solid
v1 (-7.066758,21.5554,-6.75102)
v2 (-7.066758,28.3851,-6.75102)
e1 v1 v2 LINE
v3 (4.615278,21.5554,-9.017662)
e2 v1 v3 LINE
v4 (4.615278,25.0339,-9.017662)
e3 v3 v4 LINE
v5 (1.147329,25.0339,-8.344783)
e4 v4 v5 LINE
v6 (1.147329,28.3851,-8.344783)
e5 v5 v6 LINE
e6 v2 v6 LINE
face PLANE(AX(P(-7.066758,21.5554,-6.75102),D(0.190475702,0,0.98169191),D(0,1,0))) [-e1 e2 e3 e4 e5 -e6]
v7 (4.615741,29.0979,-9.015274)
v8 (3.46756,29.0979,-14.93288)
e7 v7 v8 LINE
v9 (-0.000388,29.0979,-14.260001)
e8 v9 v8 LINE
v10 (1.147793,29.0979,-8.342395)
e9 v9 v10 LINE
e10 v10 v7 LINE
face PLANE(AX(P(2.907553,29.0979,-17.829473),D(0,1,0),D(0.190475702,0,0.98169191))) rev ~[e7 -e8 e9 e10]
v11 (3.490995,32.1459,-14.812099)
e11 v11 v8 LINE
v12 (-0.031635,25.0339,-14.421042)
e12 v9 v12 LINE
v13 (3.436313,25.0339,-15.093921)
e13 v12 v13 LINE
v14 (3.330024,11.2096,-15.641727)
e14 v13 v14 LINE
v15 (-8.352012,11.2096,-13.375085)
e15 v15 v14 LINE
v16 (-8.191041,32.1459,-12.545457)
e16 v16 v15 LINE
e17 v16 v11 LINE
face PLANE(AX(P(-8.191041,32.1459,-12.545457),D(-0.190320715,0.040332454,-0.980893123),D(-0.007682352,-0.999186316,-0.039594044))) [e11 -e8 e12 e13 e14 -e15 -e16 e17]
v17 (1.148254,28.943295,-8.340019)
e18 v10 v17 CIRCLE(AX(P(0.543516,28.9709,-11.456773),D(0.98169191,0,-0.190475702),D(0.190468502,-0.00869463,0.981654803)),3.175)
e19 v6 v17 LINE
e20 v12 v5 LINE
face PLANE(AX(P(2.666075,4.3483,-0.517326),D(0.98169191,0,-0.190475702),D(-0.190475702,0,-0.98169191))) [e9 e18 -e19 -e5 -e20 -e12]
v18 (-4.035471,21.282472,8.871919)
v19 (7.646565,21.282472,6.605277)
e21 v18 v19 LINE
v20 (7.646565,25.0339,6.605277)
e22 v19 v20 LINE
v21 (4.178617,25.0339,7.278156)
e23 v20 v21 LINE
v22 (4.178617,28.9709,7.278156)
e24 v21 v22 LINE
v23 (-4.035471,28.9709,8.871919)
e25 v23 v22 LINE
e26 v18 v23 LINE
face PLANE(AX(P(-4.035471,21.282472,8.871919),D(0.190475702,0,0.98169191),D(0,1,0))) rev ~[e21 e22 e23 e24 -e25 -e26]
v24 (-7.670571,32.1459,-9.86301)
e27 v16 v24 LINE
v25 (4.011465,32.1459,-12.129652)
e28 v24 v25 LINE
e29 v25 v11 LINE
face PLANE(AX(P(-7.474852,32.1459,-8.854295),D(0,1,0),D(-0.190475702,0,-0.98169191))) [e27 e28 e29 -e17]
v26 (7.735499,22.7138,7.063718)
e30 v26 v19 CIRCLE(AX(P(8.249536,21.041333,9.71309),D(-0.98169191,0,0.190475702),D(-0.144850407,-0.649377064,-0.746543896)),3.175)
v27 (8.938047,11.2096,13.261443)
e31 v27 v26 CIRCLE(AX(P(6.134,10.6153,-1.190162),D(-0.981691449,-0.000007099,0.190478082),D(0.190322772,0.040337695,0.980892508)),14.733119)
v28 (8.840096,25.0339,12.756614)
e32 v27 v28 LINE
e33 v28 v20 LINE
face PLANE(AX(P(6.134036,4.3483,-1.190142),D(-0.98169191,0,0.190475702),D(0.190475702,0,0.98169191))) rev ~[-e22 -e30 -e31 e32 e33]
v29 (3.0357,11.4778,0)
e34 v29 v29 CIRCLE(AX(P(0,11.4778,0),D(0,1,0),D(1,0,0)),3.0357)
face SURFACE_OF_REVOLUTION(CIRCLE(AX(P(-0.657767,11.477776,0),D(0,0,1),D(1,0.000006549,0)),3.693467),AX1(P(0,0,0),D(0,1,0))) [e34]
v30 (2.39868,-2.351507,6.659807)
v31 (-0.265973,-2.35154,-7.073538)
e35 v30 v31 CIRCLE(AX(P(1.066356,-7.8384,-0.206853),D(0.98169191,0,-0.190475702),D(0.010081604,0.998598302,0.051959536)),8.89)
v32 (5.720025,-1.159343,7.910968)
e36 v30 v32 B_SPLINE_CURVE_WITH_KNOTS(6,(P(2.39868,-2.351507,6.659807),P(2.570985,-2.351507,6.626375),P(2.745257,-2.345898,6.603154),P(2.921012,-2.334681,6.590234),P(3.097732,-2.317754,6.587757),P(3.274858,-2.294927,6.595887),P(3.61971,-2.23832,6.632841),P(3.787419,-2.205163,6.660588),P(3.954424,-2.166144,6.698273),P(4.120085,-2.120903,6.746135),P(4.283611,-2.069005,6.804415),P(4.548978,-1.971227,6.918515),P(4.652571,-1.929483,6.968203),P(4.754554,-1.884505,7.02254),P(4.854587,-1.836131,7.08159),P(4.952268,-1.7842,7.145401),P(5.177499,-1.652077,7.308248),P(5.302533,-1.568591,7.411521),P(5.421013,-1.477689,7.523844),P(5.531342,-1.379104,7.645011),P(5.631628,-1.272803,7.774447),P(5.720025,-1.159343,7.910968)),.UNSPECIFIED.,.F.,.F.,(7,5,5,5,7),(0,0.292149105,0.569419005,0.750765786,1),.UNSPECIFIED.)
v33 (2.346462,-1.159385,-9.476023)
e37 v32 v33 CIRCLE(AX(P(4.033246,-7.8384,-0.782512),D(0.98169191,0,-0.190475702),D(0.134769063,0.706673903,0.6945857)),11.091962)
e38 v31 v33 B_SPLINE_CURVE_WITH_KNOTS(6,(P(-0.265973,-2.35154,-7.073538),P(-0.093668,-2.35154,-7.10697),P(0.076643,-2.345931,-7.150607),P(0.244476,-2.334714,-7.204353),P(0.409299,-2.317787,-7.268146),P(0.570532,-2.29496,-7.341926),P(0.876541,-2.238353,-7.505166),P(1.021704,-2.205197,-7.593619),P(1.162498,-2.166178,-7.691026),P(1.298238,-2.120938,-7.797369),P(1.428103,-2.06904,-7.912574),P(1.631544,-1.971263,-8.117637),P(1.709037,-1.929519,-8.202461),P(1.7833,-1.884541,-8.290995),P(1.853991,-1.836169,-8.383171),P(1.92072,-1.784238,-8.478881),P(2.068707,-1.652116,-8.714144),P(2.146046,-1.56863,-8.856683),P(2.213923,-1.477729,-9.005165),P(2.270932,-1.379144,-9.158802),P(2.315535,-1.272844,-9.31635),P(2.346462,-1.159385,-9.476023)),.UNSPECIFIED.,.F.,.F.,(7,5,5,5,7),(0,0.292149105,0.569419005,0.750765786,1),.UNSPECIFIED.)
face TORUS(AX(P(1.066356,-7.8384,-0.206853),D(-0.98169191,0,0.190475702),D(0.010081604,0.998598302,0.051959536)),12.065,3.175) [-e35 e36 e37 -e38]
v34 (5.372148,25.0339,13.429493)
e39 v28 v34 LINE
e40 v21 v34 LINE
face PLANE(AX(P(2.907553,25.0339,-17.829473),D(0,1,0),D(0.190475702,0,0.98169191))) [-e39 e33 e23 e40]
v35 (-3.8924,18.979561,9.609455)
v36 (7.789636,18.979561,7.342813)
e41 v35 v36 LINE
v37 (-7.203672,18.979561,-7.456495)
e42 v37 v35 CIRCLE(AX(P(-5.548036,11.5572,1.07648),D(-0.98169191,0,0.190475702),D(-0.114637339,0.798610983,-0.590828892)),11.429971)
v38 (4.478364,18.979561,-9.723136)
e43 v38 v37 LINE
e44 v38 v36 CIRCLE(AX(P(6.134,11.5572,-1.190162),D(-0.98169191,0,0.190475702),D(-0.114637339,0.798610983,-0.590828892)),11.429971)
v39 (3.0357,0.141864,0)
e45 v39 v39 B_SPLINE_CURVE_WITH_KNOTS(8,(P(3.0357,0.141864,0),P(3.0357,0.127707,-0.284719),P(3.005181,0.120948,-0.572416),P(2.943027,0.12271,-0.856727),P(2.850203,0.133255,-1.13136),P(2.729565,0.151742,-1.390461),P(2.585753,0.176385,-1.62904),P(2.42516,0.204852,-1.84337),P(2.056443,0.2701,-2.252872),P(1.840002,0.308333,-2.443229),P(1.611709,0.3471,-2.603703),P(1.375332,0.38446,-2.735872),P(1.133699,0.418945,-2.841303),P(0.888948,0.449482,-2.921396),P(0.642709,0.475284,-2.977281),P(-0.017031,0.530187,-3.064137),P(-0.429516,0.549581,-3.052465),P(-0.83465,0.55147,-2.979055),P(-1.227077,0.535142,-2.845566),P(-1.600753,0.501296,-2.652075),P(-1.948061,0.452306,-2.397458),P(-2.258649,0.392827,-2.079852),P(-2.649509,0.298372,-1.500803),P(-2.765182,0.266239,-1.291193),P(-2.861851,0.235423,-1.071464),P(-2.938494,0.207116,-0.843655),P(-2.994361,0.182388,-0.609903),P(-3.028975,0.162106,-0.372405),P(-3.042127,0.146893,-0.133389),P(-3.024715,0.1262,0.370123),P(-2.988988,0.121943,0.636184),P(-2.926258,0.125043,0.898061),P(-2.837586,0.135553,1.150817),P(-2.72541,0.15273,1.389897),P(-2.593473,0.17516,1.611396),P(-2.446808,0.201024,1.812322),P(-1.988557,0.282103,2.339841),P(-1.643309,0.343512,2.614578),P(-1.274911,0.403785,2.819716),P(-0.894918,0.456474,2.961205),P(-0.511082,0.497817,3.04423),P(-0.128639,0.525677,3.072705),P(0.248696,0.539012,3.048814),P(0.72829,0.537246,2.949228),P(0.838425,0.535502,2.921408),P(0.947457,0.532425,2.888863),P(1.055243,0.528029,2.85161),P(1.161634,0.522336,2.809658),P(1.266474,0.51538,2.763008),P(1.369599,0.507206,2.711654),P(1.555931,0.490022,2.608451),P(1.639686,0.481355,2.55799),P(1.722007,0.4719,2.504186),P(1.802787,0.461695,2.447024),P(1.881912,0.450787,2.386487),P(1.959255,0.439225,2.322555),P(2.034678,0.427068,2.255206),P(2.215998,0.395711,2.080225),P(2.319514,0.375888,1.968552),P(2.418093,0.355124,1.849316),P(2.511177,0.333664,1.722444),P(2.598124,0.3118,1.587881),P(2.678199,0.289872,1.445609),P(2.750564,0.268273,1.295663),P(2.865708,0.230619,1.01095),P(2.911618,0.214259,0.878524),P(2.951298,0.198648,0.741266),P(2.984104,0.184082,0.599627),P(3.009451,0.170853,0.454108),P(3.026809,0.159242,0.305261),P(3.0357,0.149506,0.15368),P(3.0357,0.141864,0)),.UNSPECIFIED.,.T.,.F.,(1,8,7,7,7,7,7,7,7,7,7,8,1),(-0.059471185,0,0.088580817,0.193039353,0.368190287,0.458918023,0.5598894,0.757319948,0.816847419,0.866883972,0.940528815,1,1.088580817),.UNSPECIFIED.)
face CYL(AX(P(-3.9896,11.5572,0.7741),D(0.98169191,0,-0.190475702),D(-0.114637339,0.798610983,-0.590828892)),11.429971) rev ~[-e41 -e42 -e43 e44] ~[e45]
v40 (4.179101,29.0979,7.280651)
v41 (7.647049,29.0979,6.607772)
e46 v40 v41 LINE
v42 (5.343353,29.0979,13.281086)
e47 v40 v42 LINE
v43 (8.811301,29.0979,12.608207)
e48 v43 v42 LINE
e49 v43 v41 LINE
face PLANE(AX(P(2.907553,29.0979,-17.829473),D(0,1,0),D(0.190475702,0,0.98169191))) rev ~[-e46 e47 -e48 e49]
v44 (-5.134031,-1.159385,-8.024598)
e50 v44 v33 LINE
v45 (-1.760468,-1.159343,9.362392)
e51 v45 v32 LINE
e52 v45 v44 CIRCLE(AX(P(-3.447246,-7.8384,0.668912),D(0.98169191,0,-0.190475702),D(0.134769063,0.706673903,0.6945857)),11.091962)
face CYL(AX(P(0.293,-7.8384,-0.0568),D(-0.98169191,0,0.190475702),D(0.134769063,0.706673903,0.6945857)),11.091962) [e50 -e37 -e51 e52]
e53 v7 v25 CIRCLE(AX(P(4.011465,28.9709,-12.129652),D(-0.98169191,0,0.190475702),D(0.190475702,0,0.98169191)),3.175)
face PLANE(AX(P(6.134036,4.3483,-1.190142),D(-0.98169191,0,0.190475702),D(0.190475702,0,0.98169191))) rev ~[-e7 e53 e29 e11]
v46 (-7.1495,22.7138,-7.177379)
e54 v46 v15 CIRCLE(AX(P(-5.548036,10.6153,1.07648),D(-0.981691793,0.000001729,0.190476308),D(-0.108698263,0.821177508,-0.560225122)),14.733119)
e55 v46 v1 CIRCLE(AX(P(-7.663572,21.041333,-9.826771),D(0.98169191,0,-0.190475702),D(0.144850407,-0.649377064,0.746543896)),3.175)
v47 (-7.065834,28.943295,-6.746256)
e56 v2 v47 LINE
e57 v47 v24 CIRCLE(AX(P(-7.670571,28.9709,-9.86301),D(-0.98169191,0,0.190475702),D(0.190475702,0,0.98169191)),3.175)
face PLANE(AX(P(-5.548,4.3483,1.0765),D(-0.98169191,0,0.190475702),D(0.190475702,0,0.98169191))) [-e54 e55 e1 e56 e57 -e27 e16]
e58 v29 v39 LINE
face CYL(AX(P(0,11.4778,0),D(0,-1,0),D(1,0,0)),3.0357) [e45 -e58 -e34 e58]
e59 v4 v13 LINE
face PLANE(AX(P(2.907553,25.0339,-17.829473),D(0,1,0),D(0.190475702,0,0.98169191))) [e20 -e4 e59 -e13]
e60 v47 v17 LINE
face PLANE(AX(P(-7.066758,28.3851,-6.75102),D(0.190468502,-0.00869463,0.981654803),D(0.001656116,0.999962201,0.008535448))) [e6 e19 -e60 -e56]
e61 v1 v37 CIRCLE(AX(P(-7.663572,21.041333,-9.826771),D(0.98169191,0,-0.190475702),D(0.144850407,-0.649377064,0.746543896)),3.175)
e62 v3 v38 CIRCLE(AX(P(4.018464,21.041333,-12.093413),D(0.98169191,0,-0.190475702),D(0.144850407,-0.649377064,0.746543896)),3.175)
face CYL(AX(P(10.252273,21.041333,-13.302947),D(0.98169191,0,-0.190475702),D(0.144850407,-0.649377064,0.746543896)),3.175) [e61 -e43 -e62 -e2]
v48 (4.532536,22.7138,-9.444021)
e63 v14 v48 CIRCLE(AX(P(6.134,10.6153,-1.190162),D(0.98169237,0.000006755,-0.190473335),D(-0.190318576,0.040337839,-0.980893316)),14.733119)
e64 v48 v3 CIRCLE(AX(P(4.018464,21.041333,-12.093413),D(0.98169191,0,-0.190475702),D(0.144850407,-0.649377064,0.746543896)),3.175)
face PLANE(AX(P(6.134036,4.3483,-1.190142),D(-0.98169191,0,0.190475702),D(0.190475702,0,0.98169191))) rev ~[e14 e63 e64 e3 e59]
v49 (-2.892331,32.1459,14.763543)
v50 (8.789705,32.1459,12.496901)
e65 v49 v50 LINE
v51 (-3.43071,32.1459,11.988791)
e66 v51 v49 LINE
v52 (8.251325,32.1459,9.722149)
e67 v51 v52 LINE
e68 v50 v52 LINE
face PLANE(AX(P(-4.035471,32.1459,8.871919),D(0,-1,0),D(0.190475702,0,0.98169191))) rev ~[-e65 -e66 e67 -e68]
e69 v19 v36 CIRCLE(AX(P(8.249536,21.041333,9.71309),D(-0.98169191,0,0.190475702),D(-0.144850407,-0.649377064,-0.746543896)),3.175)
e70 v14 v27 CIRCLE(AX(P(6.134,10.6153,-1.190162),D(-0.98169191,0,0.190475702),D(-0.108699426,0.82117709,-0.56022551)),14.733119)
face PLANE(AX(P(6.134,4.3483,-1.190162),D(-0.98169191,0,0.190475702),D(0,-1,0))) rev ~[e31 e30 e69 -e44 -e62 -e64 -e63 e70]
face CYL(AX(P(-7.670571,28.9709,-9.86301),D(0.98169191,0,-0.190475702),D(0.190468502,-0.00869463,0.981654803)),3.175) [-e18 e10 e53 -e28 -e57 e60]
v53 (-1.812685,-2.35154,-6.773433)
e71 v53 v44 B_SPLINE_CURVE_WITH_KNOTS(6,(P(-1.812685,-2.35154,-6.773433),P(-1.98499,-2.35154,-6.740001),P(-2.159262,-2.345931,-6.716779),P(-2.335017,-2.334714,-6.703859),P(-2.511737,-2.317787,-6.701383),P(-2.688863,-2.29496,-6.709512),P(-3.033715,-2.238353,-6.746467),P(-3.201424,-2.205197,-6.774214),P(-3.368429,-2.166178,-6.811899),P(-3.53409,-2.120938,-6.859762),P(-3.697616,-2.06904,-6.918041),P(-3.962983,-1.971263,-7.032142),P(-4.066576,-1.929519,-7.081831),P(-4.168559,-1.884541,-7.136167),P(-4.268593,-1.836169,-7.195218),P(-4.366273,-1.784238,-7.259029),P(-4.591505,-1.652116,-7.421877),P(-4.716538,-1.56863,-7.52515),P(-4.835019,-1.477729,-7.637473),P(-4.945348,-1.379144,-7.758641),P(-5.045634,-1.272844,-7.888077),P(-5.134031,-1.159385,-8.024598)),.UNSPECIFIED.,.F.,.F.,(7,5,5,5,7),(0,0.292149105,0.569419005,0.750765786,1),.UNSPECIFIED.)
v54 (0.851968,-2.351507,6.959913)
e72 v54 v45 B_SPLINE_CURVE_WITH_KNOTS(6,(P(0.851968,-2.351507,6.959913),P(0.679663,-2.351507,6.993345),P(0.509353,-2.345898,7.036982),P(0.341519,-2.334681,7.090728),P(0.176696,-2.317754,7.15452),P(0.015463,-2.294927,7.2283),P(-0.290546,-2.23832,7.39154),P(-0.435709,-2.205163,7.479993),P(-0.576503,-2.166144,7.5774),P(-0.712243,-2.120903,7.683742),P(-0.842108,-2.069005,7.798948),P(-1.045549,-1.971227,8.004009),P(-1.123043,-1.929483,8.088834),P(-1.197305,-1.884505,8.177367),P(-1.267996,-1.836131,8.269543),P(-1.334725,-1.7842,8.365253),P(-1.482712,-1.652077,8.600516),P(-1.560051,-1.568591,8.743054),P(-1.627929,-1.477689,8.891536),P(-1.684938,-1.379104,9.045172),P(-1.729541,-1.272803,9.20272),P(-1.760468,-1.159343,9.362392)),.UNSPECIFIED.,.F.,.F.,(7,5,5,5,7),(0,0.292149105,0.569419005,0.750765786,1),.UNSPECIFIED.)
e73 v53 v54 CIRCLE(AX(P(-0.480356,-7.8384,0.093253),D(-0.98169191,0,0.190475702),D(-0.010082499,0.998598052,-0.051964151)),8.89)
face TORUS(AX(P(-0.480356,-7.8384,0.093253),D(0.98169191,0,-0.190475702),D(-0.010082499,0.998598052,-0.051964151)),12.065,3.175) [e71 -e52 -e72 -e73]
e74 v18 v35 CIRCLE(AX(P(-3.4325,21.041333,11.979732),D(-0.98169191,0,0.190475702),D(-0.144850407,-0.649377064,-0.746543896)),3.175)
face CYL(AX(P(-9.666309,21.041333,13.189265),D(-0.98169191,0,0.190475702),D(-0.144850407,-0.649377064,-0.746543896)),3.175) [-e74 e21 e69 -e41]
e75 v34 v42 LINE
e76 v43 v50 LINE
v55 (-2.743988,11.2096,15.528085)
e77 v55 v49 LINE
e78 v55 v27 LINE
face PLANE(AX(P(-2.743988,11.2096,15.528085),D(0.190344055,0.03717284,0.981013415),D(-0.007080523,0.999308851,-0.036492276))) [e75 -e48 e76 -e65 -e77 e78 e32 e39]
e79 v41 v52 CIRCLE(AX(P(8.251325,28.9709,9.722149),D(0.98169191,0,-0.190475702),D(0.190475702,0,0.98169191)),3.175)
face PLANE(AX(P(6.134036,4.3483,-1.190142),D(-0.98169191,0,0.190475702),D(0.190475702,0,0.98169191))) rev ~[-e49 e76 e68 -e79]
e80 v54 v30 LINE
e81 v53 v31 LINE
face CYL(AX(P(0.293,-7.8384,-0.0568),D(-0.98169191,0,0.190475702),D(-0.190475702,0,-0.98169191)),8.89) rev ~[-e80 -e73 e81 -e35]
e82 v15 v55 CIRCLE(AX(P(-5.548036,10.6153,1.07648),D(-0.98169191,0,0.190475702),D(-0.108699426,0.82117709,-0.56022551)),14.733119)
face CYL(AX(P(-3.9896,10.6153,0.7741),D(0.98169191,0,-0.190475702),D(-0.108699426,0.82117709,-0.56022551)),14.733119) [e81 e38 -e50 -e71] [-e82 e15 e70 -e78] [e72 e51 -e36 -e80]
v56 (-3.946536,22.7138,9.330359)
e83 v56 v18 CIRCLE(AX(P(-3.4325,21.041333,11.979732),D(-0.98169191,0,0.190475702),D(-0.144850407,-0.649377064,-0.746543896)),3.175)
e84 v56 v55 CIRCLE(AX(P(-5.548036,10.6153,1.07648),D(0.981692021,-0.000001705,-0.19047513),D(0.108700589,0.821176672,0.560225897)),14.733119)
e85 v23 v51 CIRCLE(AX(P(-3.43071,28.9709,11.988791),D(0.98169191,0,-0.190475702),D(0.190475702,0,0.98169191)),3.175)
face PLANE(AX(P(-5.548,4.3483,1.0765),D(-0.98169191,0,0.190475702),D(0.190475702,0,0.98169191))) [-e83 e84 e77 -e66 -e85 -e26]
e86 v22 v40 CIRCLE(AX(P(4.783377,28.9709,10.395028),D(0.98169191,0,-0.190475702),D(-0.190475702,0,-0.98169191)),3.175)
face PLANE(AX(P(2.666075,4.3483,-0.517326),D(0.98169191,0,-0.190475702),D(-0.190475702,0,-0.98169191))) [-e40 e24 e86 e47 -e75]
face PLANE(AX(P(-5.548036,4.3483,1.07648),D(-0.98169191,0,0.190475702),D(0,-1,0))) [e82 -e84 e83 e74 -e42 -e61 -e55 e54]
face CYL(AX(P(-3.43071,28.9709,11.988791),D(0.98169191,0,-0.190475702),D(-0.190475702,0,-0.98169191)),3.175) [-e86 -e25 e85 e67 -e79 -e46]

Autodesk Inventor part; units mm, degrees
ref_plane "YZ Plane" through (0, 0, 0) normal (1, 0, 0) x (0, 1, 0)
sketch "Sketch1" plane through (0, 0, 0) normal (0, 0, 1) x (1, 0, 0)
  line L0 (0, 0) -> (0, 15.1122)
  line L1 (3.0357, 11.4778) -> (3.0357, 0)
  line L2 (3.0357, 0) -> (0, 0)
  arc A0 (3.0357, 11.4778) -> (0, 15.1122) centre (-0.6577, 11.4778) ccw
ref_plane "Work Plane3" through (0, 17.8837, 0) normal (0, 1, 0) x (1, 0, 0)
ref_plane "Work Plane1" through (-3.9896, 4.3483, 0.7741) normal (-0.9816919, 0, 0.1904757) x (0, -1, 0)
sketch "Sketch3" plane through (-3.9896, 4.3483, 0.7741) normal (-0.9816919, 0, 0.1904757) x (0, -1, 0)
  arc A0 (-16.337, -6.8791) -> (-16.337, 6.8791) centre (-7.2089, 0) ccw
  line L0 (-13.5354, -0.5887) -> (0.7521, -0.5887) projected
  line L1 (-13.5354, 0.6171) -> (0.7521, 0.6171) projected
  line L2 (-7.2089, 0) -> (-7.9901, -0.5887)
  line L3 (-16.337, -6.8791) -> (-18.3655, -8.4078)
  line L4 (-7.2089, 0) -> (-8.0277, 0.6171)
  line L5 (-16.337, 6.8791) -> (-18.3655, 8.4078)
  arc A1 (-18.3655, -8.4078) -> (-18.3655, 8.4078) centre (-6.267, 0) ccw
extrude "Extrusion2" add sketch "Sketch3" along normal blind 1.5875 and the other way blind 10.3124
fillet "Fillet1" radius 3.175 2 edges at (-1.0173, 20.6854, -6.81) (1.6033, 20.6854, 6.6963)
ref_plane "Work Plane2" through (0.293, 4.3483, -0.0568) normal (0.9816919, 0, -0.1904757) x (-0.1904757, 0, -0.9816919)
sketch "Sketch4" plane through (0.293, 4.3483, -0.0568) normal (0.9816919, 0, -0.1904757) x (-0.1904757, 0, -0.9816919)
  circle A0 centre (0, -12.1867) radius 8.89
  arc A1 (-8.4078, 18.3655) -> (8.4078, 18.3655) centre (0, 7.2089) ccw projected
  arc A2 (-7.848, -4.3483) -> (7.848, -4.3483) centre (0, -12.1867) ccw
  point P0 (0, -4.3483)
  point P1 (5.8384, -5.4826)
  point P2 (-5.8384, -5.4826)
  dimension "d17" = 17.78
extrude "Extrusion3" add sketch "Sketch4" along normal mid plane 7.62 contours A0 A1 A2
fillet "Fillet2" radius 3.175 2 edges at (-3.4473, -16.7283, 0.6689) (4.0332, -16.7283, -0.7826)
sketch "Sketch5" plane through (-5.548, 4.3483, 1.0765) normal (-0.9816919, 0, 0.1904757) x (0.1904757, 0, 0.9816919)
  arc A0 (-8.6921, 14.6313) -> (-8.4078, 18.3655) centre (-11.1066, 16.6931) ccw
  line L0 (-7.9735, 17.2071) -> (-7.9735, 24.0368)
  line L1 (-10.116, 16.8437) -> (-10.116, 16.3667)
  arc A1 (8.4078, 18.3655) -> (8.6921, 14.6313) centre (11.1066, 16.6931) ccw
  line L2 (7.9735, 17.2071) -> (7.9735, 24.0368)
  line L3 (10.0556, 16.9067) -> (10.0556, 16.0648)
  line L4 (-8.0331, 17.1837) -> (-7.9735, 17.2071)
  line L5 (-7.9735, 24.0368) -> (-7.9408, 27.7976)
  line L6 (-10.116, 27.7976) -> (-7.9408, 27.7976)
  line L7 (7.9408, 27.7976) -> (10.0556, 27.7976)
  arc A2 (-8.4078, 18.3655) -> (8.4078, 18.3655) centre (0, 7.2089) ccw
  line L8 (7.9408, 27.7976) -> (13.9423, 27.7976)
  line L9 (13.9423, 27.7976) -> (13.9423, 6.3292)
  line L10 (13.9423, 6.3292) -> (13.9416, 6.3292)
  line L11 (7.9408, 16.452) -> (7.9408, 27.7976)
  line L12 (-7.9408, 27.7976) -> (-13.876, 27.7976)
  line L13 (-13.876, 27.7976) -> (-13.876, 6.3292)
  line L14 (-7.9408, 16.452) -> (-7.9408, 27.7976)
  arc A3 (13.9421, 6.3267) -> (7.9408, 16.452) centre (-4.3172, 2.3454) ccw
  arc A4 (-7.9408, 16.452) -> (-13.876, 6.3292) centre (3.6251, 2.8693) ccw
  line L15 (-8.1275, 6.3292) -> (-7.9408, 6.3292)
  line L16 (-13.876, 6.3292) -> (-13.876, -0.5906) construction
  line L17 (-13.876, -0.5906) -> (-10.116, -4.3483) construction
  arc A5 (-6.9947, -6.6998) -> (6.9947, -6.6998) centre (0, -12.1867) ccw
  line L18 (-10.116, -4.3483) -> (-7.0424, -6.7611) construction
  line L19 (-7.0424, -6.7611) -> (0, -8.3144) construction
  line L20 (0, -8.3144) -> (5.2825, -7.1493) construction
  line L21 (13.9421, 5.8129) -> (13.9421, 6.3267) construction
  arc A6 (10.0377, -3.7332) -> (10.431, -3.4046) centre (1.9746, 6.3181) ccw
  spline S0 degree 4 poles (-13.876, 6.3292) (-13.876, -0.5906) (-10.116, -4.3483) (-7.0424, -6.7611) (0, -8.3144) (5.2825, -7.1493) (8.5532, -4.7704) (10.0372, -3.7336) (10.0377, -3.7332) knots 1 1 1 1 1 2 3 4 5 5.000386 5.000386 5.000386 5.000386 5.000386
  spline S1 degree 4 poles (13.9158, 4.457) (13.9287, 4.8802) (13.9376, 5.3315) (13.9421, 5.8129) (13.9421, 6.3267) knots 0 0 0 0 0 1 1 1 1 1
  line L22 (5.2825, -7.1493) -> (8.5532, -4.7704) construction
  line L23 (8.5532, -4.7704) -> (10.0372, -3.7336) construction
  line L24 (10.0372, -3.7336) -> (10.0377, -3.7332) construction
  arc A7 (10.431, -3.4046) -> (13.9421, 6.3267) centre (0.7781, 5.5773) ccw
  line L25 (13.9158, 4.457) -> (13.9287, 4.8802) construction
  line L26 (13.9287, 4.8802) -> (13.9376, 5.3315) construction
  line L27 (13.9376, 5.3315) -> (13.9421, 5.8129) construction
  point P0 (0, -4.3483)
  point P1 (10.0556, 24.2784)
  point P2 (7.9735, 31.5584)
  point P3 (-7.9735, 31.5584)
  point P4 (-10.116, 31.5584)
  point P5 (-10.116, 27.7976)
  point P6 (-13.876, 8.8266)
  point P7 (7.9408, 16.9341)
  point P8 (13.9423, 8.0887)
  point P9 (10.0556, 27.7976)
  point P10 (5.8384, -5.4826)
  point P11 (-5.8384, -5.4826)
sketch "Sketch6" plane through (-5.548, 4.3483, 1.0765) normal (-0.9816919, 0, 0.1904757) x (0.1904757, 0, 0.9816919)
  point P0 (0, -4.3483)
revolve "Revolution3" add sketch "Sketch1" angle 360 about axis through (0, 0, 0) along (0, 1, 0)
extrude "Extrusion7" add sketch "Sketch5" against normal up to surface (11.8999 mm away) contours A0 A2 L13 L12 L6 L5 L0 | A2 A1 L11 L7 L8 L9
fillet "Fillet4" radius 3.175 2 edges at (-1.2195, 32.1459, -7.8522) (1.8055, 32.1459, 7.7386)
sketch "Sketch9" plane through (-5.548, 4.3483, 1.0765) normal (-0.9816919, 0, 0.1904757) x (0.1904757, 0, 0.9816919)
  line L0 (-13.876, 11.2188) -> (-13.876, 27.7976) projected
  line L1 (-13.876, 27.7976) -> (-14.7211, 6.8613)
  arc A0 (-13.876, 11.2188) -> (13.9423, 11.0291) centre (0, 6.267) ccw projected
  line L2 (14.7211, 6.8613) -> (13.9423, 27.7976)
  line L3 (-13.876, 27.7976) -> (-11.1435, 27.7976) projected
  line L4 (-13.876, 27.7976) -> (-12.5098, 7.6225)
  line L5 (-12.5098, 7.6225) -> (-14.7211, 6.8613)
  line L6 (14.7211, 6.8613) -> (11.1518, 18.0483)
  line L7 (13.9423, 27.7976) -> (13.9423, 11.0291) projected
  line L8 (11.1518, 18.0483) -> (13.9423, 27.7976)
  point P0 (0, -4.3483)
extrude "Extrusion10" add sketch "Sketch9" against normal up to surface (11.8999 mm away) contours A0 L1 L0 | A0 L7 L2
sketch "Sketch11" plane through (6.134, 4.3483, -1.1902) normal (0.9816919, 0, -0.1904757) x (-0.1904757, 0, -0.9816919)
  line L0 (-13.9423, 27.7976) -> (-14.7211, 6.8613) projected
  line L1 (16.9492, 20.6856) -> (16.9492, 24.7496)
  line L2 (16.9492, 24.7496) -> (-14.3317, 24.7496)
  line L3 (-14.3317, 24.7496) -> (-14.3317, 20.6856)
  line L4 (13.876, 27.7976) -> (11.1435, 27.7976) projected
  line L5 (16.9492, 20.6856) -> (-14.3317, 20.6856)
  point P0 (0, -4.3483)
  point P1 (-14.3317, 17.3294)
  point P2 (-14.0557, 24.7496)
  point P3 (12.5098, 27.7976)
  point P4 (-14.2068, 20.6856)
  dimension "d55" = 3.048
  dimension "d56" = 7.112
sketch "Sketch12" plane through (6.134, 4.3483, -1.1902) normal (0.9816919, 0, -0.1904757) x (-0.1904757, 0, -0.9816919)
  point P0 (0, -4.3483)
extrude "Extrusion13" cut sketch "Sketch11" against normal blind 3.5306
properties part number "Clip12"
